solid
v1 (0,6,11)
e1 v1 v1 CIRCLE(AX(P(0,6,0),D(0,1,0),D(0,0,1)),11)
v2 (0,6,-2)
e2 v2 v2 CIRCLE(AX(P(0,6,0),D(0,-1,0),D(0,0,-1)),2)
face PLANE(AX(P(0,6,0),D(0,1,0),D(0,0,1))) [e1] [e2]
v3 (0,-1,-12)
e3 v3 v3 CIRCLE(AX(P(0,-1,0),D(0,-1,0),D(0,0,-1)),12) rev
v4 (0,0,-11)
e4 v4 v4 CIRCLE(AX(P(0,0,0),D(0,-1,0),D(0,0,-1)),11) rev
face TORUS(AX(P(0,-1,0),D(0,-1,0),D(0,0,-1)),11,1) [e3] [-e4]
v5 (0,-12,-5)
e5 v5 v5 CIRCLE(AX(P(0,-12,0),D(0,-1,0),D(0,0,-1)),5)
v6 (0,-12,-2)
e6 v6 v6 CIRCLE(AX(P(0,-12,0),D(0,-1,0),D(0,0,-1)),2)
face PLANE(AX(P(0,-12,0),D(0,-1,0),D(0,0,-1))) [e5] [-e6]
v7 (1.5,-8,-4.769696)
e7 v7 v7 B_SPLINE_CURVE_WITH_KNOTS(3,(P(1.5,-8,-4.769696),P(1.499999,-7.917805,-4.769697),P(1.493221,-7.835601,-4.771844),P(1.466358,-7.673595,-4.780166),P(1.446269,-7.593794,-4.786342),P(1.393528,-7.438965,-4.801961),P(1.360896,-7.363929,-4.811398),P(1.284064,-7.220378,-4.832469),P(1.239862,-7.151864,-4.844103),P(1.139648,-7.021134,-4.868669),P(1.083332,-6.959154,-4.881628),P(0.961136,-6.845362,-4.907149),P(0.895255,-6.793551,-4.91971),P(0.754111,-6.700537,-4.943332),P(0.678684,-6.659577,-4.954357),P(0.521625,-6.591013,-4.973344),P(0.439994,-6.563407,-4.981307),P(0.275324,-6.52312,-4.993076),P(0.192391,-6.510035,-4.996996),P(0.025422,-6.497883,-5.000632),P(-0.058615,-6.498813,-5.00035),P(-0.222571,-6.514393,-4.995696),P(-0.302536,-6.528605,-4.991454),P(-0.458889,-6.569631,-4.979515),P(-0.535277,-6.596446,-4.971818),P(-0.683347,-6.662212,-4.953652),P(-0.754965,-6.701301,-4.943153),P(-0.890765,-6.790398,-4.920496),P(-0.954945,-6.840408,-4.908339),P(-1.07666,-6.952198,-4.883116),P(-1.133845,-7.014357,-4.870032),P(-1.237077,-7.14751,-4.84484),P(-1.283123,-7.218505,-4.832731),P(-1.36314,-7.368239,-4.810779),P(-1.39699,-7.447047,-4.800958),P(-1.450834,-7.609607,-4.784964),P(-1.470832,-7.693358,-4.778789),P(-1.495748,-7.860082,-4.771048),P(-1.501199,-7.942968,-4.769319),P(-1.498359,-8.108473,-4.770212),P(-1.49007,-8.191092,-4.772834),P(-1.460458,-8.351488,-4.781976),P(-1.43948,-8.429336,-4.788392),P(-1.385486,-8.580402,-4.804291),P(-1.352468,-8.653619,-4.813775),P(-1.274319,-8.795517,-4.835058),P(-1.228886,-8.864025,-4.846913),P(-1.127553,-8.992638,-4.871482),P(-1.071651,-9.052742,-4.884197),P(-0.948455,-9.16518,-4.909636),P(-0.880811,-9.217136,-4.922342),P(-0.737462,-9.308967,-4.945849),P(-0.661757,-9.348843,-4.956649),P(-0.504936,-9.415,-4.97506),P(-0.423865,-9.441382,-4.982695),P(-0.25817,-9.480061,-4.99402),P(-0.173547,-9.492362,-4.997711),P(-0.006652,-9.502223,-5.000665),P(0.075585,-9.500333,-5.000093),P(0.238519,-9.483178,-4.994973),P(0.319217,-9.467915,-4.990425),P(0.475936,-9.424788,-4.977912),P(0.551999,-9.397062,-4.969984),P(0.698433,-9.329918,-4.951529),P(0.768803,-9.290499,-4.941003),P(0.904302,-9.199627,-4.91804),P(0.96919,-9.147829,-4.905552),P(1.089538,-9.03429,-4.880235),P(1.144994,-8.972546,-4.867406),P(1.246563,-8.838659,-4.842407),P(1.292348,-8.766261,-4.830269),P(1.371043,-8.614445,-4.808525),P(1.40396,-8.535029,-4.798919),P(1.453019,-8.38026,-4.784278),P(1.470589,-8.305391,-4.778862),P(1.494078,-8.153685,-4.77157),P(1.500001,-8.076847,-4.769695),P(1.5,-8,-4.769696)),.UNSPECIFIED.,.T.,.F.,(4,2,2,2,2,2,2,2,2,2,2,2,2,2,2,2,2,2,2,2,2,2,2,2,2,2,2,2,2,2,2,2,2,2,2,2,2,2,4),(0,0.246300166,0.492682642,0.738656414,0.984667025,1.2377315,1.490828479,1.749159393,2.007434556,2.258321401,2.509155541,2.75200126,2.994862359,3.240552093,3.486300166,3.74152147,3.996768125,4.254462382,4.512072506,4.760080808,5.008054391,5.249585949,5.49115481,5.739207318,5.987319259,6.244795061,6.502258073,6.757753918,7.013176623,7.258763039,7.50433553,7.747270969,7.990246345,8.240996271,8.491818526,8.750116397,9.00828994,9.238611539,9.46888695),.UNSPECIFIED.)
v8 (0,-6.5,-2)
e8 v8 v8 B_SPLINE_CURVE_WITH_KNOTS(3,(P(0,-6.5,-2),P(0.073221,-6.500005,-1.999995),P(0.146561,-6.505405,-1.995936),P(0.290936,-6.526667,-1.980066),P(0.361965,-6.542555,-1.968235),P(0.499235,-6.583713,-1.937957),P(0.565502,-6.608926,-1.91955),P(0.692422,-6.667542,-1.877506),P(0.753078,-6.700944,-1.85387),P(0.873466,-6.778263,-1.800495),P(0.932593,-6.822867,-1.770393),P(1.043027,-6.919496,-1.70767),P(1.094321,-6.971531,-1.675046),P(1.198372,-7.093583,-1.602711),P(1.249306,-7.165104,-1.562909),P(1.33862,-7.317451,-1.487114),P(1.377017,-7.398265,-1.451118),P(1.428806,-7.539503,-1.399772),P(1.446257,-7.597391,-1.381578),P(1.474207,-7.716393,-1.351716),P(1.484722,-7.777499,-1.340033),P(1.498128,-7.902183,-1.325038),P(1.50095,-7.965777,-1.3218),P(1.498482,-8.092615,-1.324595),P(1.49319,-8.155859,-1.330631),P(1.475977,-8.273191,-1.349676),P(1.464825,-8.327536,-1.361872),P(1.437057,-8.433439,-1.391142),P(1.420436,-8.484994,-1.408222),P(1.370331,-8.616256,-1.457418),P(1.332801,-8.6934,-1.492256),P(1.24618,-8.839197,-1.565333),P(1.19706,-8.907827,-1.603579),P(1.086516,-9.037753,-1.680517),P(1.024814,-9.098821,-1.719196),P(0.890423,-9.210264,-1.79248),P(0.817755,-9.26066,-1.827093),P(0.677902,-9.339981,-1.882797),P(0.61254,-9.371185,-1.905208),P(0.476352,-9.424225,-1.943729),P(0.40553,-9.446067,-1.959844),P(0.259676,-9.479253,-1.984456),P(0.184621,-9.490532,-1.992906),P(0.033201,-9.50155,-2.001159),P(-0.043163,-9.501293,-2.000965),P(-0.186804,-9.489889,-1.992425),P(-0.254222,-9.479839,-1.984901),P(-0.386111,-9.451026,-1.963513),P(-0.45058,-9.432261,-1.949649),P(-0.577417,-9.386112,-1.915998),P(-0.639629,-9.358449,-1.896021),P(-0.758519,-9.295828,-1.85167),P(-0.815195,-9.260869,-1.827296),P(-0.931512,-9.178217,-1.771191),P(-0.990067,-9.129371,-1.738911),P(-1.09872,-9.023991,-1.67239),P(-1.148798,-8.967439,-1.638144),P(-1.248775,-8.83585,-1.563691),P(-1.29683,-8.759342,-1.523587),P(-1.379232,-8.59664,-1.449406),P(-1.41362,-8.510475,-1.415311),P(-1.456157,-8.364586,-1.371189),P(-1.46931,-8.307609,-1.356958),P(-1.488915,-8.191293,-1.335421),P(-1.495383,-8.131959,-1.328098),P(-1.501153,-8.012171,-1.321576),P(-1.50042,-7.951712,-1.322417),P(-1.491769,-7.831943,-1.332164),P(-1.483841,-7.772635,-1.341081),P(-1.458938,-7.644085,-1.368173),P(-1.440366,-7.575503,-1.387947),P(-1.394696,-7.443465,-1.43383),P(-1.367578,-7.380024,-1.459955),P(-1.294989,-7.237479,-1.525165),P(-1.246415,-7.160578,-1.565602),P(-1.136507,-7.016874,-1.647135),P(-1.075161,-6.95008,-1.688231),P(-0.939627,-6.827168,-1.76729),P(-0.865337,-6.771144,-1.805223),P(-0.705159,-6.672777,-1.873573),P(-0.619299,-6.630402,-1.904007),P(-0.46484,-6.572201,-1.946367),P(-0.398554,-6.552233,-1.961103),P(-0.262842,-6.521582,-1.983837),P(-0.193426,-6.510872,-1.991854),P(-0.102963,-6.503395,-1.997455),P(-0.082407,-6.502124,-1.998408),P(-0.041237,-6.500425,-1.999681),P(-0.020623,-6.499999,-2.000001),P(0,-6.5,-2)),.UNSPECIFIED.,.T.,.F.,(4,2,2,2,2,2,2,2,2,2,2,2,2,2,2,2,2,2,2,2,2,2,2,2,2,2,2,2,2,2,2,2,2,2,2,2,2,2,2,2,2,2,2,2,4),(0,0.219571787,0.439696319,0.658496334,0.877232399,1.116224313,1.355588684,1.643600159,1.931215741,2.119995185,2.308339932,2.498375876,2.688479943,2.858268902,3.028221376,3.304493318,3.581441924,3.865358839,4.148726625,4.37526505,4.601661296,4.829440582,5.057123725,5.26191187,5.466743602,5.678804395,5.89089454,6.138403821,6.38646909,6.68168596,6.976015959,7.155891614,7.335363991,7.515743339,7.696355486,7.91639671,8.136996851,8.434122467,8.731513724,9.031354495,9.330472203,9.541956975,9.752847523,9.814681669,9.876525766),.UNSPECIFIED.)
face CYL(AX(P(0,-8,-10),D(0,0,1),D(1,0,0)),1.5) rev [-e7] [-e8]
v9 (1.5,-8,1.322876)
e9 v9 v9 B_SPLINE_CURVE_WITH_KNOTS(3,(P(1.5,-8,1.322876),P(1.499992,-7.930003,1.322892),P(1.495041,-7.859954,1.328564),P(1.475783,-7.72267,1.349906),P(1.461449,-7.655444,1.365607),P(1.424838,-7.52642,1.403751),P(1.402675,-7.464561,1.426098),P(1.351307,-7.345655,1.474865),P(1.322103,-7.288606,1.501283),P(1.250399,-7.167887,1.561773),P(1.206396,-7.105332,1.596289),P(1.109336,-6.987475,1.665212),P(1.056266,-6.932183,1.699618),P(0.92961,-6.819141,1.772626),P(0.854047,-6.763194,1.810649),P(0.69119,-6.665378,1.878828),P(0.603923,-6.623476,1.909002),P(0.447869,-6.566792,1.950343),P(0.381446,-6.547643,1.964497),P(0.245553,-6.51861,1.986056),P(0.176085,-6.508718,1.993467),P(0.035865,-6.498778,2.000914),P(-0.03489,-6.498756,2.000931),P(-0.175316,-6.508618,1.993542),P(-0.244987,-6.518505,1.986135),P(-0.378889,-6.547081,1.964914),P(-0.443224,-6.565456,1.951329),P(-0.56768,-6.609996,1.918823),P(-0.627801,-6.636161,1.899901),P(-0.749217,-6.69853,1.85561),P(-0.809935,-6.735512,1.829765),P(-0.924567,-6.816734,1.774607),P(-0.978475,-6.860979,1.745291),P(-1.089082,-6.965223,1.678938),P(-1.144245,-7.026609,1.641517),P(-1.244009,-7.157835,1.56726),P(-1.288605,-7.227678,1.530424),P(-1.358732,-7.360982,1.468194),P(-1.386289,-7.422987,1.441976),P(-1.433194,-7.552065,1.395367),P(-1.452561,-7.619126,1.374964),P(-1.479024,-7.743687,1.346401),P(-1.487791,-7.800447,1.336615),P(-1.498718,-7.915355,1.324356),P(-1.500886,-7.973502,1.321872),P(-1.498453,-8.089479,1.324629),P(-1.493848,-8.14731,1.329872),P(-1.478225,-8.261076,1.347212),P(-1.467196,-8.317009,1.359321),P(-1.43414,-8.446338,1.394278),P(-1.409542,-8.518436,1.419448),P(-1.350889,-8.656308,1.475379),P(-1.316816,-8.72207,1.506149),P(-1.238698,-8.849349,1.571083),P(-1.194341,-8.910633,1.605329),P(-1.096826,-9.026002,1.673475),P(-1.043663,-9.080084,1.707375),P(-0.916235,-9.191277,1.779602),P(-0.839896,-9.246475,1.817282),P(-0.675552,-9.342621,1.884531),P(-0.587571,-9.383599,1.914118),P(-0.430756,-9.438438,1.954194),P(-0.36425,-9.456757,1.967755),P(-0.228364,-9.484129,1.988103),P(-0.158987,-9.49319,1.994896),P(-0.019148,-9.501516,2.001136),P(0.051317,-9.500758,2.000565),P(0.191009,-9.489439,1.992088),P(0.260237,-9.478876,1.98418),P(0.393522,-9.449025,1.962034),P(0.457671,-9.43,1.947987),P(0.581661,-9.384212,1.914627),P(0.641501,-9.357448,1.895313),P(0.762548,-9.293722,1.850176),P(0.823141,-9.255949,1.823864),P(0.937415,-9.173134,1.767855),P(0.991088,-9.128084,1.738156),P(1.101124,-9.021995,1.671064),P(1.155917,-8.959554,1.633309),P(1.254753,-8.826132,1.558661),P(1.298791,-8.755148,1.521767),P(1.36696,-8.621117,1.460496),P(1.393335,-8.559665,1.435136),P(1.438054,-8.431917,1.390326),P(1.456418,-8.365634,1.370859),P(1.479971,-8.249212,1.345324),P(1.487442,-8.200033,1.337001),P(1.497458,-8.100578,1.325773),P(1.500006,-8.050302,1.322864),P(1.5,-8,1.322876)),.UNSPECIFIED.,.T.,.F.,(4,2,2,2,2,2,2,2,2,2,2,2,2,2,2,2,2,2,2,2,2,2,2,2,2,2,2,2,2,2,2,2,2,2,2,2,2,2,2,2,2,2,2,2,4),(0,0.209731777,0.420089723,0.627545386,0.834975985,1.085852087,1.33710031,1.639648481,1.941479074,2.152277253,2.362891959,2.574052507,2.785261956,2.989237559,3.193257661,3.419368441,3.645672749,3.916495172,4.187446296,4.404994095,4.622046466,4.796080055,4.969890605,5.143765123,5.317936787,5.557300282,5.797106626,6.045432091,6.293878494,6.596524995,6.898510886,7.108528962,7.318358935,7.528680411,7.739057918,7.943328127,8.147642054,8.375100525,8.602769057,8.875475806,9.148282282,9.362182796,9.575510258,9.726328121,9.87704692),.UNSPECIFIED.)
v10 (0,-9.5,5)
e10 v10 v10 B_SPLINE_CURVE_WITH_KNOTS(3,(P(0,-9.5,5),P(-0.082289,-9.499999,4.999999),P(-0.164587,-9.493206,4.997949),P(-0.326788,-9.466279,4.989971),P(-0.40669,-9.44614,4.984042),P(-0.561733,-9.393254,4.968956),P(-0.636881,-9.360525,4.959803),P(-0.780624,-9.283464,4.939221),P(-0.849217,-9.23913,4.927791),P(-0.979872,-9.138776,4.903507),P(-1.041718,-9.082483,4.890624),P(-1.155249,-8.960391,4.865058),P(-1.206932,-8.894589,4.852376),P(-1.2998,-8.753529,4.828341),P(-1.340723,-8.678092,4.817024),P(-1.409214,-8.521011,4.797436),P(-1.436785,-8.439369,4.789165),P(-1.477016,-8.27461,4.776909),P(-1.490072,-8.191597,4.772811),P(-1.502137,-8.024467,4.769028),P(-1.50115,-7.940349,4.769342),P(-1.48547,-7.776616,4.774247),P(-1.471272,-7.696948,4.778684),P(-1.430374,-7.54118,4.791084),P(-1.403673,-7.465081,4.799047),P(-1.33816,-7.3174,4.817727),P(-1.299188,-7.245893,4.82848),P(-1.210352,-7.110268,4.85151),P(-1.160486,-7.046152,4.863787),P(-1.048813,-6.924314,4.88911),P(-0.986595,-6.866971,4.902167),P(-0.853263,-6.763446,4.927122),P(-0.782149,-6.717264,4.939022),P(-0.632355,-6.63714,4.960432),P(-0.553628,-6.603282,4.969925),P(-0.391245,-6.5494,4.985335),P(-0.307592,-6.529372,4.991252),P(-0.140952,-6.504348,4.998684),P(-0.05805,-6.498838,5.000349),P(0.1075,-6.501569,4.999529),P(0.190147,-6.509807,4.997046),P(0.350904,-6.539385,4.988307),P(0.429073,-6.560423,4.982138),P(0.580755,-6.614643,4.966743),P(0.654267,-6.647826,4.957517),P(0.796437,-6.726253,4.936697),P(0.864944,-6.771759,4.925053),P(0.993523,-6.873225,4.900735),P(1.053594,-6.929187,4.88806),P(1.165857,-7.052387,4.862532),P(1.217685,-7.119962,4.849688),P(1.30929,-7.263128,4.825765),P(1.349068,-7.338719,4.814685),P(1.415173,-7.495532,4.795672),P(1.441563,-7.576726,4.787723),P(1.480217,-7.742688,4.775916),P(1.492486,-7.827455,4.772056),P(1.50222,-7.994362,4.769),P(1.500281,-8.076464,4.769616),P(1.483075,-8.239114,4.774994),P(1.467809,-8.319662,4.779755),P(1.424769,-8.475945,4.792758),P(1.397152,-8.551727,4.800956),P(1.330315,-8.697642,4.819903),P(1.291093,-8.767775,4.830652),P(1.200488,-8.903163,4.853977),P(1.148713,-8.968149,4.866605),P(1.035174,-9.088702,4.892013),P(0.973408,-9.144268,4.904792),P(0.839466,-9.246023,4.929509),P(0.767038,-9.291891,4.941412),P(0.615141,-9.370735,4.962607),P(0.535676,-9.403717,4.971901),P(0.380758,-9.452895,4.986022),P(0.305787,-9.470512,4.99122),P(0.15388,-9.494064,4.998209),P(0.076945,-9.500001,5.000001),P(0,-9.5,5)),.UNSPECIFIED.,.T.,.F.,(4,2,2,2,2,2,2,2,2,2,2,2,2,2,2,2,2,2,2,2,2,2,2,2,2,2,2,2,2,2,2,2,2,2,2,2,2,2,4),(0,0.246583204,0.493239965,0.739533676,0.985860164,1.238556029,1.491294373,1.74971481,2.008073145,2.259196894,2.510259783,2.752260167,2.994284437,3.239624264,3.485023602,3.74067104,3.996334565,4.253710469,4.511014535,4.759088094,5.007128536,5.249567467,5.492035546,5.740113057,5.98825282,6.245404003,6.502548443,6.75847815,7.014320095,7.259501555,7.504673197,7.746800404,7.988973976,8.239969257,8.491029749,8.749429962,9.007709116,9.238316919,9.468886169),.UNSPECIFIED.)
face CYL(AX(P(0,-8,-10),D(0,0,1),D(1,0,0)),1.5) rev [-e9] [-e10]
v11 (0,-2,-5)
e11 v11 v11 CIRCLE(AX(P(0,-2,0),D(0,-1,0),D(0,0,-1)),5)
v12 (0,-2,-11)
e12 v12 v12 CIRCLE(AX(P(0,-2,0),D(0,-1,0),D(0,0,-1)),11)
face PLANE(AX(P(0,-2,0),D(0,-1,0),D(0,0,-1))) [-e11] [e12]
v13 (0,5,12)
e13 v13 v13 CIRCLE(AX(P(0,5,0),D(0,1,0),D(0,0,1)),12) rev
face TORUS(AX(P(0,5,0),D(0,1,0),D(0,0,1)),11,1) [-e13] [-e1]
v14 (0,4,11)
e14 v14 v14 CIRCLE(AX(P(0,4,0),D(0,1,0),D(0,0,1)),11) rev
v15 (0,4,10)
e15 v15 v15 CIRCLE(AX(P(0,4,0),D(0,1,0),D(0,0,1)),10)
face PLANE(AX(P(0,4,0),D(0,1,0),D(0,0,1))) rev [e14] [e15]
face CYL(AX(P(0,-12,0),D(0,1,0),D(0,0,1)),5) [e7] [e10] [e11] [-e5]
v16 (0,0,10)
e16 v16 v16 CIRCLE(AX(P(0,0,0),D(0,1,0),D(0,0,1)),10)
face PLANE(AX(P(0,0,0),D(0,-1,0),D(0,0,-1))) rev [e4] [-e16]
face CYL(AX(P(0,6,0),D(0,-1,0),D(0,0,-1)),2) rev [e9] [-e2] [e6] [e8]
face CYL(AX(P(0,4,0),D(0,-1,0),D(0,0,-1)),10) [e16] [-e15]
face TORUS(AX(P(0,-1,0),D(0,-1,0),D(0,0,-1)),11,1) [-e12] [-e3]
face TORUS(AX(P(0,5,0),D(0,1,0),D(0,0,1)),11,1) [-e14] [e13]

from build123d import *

# Parameters (mm, degrees)
SKETCH_1_R               = 10
EXTRUDE_1_DEPTH          = 4
SKETCH_2_R               = 12
EXTRUDE_2_DEPTH          = 2
EXTRUDE_START            = 2
SKETCH_3_R               = 12
EXTRUDE_3_DEPTH          = 2
SKETCH_4_R               = 5
EXTRUDE_4_DEPTH          = 10
SKETCH_5_R               = 2
CUT_EXTRUDE_1_DEPTH      = 25.738633754
FILLET_2_R               = 1
CUT_EXTRUDE_2_DEPTH      = 10
CUT_EXTRUDE_2_DEPTH_BACK = 10
SKETCH_6_R               = 1.5


with BuildPart() as part:
    # 草图1 → 凸台-拉伸1 (new body)
    with BuildSketch(Plane(origin=(0, 0, 0), x_dir=(1, 0, 0), z_dir=(0, 1, 0))):
        with Locations(Location((0, 0, 0), (0, 0, 270))):
            Circle(SKETCH_1_R)
    extrude(amount=EXTRUDE_1_DEPTH)

    # 草图2 → 凸台-拉伸2 (add)
    with BuildSketch(Plane(origin=(0, 4, 0), x_dir=(1, 0, 0), z_dir=(0, 1, 0))):
        with Locations(Location((0, 0, 0), (0, 0, 270))):
            Circle(SKETCH_2_R)
    extrude(amount=EXTRUDE_2_DEPTH)

    # 草图3 → 凸台-拉伸3 (add)
    with BuildSketch(Plane.XZ.offset(EXTRUDE_START)):
        with Locations(Location((0, 0, 0), (0, 0, 90))):
            Circle(SKETCH_3_R)
    extrude(amount=-EXTRUDE_3_DEPTH)

    # 草图4 → 凸台-拉伸4 (add)
    with BuildSketch(Plane(origin=(0, -2, 0), x_dir=(-1, 0, 0), z_dir=(0, -1, 0))):
        with Locations(Location((0, 0, 0), (0, 0, 90))):
            Circle(SKETCH_4_R)
    extrude(amount=EXTRUDE_4_DEPTH)

    # 草图5 → 切除-拉伸1 (cut, through all)
    with BuildSketch(Plane.XZ.offset(12)):
        with Locations(Location((0, 0, 0), (0, 0, 270))):
            Circle(SKETCH_5_R)
    extrude(amount=-CUT_EXTRUDE_1_DEPTH, mode=Mode.SUBTRACT)

    # 圆角2
    fillet_2_edges = [part.edges().sort_by_distance(p)[0] for p in [
        (0, -2, -12),
        (0, 4, -12),
        (0, 6, -12),
        (0, 0, -12),
    ]]
    fillet(fillet_2_edges, radius=FILLET_2_R - 0.0001)  # a hair under: the kernel refuses the full size

    # 草图6 → 切除-拉伸2 (cut, two sides: drawn at the far end of the back side and taken through both)
    with BuildSketch(Plane.XY.offset(-CUT_EXTRUDE_2_DEPTH_BACK)):
        with Locations((0, -8)):
            Circle(SKETCH_6_R)
    extrude(amount=CUT_EXTRUDE_2_DEPTH + CUT_EXTRUDE_2_DEPTH_BACK, mode=Mode.SUBTRACT)


solid = part.part
